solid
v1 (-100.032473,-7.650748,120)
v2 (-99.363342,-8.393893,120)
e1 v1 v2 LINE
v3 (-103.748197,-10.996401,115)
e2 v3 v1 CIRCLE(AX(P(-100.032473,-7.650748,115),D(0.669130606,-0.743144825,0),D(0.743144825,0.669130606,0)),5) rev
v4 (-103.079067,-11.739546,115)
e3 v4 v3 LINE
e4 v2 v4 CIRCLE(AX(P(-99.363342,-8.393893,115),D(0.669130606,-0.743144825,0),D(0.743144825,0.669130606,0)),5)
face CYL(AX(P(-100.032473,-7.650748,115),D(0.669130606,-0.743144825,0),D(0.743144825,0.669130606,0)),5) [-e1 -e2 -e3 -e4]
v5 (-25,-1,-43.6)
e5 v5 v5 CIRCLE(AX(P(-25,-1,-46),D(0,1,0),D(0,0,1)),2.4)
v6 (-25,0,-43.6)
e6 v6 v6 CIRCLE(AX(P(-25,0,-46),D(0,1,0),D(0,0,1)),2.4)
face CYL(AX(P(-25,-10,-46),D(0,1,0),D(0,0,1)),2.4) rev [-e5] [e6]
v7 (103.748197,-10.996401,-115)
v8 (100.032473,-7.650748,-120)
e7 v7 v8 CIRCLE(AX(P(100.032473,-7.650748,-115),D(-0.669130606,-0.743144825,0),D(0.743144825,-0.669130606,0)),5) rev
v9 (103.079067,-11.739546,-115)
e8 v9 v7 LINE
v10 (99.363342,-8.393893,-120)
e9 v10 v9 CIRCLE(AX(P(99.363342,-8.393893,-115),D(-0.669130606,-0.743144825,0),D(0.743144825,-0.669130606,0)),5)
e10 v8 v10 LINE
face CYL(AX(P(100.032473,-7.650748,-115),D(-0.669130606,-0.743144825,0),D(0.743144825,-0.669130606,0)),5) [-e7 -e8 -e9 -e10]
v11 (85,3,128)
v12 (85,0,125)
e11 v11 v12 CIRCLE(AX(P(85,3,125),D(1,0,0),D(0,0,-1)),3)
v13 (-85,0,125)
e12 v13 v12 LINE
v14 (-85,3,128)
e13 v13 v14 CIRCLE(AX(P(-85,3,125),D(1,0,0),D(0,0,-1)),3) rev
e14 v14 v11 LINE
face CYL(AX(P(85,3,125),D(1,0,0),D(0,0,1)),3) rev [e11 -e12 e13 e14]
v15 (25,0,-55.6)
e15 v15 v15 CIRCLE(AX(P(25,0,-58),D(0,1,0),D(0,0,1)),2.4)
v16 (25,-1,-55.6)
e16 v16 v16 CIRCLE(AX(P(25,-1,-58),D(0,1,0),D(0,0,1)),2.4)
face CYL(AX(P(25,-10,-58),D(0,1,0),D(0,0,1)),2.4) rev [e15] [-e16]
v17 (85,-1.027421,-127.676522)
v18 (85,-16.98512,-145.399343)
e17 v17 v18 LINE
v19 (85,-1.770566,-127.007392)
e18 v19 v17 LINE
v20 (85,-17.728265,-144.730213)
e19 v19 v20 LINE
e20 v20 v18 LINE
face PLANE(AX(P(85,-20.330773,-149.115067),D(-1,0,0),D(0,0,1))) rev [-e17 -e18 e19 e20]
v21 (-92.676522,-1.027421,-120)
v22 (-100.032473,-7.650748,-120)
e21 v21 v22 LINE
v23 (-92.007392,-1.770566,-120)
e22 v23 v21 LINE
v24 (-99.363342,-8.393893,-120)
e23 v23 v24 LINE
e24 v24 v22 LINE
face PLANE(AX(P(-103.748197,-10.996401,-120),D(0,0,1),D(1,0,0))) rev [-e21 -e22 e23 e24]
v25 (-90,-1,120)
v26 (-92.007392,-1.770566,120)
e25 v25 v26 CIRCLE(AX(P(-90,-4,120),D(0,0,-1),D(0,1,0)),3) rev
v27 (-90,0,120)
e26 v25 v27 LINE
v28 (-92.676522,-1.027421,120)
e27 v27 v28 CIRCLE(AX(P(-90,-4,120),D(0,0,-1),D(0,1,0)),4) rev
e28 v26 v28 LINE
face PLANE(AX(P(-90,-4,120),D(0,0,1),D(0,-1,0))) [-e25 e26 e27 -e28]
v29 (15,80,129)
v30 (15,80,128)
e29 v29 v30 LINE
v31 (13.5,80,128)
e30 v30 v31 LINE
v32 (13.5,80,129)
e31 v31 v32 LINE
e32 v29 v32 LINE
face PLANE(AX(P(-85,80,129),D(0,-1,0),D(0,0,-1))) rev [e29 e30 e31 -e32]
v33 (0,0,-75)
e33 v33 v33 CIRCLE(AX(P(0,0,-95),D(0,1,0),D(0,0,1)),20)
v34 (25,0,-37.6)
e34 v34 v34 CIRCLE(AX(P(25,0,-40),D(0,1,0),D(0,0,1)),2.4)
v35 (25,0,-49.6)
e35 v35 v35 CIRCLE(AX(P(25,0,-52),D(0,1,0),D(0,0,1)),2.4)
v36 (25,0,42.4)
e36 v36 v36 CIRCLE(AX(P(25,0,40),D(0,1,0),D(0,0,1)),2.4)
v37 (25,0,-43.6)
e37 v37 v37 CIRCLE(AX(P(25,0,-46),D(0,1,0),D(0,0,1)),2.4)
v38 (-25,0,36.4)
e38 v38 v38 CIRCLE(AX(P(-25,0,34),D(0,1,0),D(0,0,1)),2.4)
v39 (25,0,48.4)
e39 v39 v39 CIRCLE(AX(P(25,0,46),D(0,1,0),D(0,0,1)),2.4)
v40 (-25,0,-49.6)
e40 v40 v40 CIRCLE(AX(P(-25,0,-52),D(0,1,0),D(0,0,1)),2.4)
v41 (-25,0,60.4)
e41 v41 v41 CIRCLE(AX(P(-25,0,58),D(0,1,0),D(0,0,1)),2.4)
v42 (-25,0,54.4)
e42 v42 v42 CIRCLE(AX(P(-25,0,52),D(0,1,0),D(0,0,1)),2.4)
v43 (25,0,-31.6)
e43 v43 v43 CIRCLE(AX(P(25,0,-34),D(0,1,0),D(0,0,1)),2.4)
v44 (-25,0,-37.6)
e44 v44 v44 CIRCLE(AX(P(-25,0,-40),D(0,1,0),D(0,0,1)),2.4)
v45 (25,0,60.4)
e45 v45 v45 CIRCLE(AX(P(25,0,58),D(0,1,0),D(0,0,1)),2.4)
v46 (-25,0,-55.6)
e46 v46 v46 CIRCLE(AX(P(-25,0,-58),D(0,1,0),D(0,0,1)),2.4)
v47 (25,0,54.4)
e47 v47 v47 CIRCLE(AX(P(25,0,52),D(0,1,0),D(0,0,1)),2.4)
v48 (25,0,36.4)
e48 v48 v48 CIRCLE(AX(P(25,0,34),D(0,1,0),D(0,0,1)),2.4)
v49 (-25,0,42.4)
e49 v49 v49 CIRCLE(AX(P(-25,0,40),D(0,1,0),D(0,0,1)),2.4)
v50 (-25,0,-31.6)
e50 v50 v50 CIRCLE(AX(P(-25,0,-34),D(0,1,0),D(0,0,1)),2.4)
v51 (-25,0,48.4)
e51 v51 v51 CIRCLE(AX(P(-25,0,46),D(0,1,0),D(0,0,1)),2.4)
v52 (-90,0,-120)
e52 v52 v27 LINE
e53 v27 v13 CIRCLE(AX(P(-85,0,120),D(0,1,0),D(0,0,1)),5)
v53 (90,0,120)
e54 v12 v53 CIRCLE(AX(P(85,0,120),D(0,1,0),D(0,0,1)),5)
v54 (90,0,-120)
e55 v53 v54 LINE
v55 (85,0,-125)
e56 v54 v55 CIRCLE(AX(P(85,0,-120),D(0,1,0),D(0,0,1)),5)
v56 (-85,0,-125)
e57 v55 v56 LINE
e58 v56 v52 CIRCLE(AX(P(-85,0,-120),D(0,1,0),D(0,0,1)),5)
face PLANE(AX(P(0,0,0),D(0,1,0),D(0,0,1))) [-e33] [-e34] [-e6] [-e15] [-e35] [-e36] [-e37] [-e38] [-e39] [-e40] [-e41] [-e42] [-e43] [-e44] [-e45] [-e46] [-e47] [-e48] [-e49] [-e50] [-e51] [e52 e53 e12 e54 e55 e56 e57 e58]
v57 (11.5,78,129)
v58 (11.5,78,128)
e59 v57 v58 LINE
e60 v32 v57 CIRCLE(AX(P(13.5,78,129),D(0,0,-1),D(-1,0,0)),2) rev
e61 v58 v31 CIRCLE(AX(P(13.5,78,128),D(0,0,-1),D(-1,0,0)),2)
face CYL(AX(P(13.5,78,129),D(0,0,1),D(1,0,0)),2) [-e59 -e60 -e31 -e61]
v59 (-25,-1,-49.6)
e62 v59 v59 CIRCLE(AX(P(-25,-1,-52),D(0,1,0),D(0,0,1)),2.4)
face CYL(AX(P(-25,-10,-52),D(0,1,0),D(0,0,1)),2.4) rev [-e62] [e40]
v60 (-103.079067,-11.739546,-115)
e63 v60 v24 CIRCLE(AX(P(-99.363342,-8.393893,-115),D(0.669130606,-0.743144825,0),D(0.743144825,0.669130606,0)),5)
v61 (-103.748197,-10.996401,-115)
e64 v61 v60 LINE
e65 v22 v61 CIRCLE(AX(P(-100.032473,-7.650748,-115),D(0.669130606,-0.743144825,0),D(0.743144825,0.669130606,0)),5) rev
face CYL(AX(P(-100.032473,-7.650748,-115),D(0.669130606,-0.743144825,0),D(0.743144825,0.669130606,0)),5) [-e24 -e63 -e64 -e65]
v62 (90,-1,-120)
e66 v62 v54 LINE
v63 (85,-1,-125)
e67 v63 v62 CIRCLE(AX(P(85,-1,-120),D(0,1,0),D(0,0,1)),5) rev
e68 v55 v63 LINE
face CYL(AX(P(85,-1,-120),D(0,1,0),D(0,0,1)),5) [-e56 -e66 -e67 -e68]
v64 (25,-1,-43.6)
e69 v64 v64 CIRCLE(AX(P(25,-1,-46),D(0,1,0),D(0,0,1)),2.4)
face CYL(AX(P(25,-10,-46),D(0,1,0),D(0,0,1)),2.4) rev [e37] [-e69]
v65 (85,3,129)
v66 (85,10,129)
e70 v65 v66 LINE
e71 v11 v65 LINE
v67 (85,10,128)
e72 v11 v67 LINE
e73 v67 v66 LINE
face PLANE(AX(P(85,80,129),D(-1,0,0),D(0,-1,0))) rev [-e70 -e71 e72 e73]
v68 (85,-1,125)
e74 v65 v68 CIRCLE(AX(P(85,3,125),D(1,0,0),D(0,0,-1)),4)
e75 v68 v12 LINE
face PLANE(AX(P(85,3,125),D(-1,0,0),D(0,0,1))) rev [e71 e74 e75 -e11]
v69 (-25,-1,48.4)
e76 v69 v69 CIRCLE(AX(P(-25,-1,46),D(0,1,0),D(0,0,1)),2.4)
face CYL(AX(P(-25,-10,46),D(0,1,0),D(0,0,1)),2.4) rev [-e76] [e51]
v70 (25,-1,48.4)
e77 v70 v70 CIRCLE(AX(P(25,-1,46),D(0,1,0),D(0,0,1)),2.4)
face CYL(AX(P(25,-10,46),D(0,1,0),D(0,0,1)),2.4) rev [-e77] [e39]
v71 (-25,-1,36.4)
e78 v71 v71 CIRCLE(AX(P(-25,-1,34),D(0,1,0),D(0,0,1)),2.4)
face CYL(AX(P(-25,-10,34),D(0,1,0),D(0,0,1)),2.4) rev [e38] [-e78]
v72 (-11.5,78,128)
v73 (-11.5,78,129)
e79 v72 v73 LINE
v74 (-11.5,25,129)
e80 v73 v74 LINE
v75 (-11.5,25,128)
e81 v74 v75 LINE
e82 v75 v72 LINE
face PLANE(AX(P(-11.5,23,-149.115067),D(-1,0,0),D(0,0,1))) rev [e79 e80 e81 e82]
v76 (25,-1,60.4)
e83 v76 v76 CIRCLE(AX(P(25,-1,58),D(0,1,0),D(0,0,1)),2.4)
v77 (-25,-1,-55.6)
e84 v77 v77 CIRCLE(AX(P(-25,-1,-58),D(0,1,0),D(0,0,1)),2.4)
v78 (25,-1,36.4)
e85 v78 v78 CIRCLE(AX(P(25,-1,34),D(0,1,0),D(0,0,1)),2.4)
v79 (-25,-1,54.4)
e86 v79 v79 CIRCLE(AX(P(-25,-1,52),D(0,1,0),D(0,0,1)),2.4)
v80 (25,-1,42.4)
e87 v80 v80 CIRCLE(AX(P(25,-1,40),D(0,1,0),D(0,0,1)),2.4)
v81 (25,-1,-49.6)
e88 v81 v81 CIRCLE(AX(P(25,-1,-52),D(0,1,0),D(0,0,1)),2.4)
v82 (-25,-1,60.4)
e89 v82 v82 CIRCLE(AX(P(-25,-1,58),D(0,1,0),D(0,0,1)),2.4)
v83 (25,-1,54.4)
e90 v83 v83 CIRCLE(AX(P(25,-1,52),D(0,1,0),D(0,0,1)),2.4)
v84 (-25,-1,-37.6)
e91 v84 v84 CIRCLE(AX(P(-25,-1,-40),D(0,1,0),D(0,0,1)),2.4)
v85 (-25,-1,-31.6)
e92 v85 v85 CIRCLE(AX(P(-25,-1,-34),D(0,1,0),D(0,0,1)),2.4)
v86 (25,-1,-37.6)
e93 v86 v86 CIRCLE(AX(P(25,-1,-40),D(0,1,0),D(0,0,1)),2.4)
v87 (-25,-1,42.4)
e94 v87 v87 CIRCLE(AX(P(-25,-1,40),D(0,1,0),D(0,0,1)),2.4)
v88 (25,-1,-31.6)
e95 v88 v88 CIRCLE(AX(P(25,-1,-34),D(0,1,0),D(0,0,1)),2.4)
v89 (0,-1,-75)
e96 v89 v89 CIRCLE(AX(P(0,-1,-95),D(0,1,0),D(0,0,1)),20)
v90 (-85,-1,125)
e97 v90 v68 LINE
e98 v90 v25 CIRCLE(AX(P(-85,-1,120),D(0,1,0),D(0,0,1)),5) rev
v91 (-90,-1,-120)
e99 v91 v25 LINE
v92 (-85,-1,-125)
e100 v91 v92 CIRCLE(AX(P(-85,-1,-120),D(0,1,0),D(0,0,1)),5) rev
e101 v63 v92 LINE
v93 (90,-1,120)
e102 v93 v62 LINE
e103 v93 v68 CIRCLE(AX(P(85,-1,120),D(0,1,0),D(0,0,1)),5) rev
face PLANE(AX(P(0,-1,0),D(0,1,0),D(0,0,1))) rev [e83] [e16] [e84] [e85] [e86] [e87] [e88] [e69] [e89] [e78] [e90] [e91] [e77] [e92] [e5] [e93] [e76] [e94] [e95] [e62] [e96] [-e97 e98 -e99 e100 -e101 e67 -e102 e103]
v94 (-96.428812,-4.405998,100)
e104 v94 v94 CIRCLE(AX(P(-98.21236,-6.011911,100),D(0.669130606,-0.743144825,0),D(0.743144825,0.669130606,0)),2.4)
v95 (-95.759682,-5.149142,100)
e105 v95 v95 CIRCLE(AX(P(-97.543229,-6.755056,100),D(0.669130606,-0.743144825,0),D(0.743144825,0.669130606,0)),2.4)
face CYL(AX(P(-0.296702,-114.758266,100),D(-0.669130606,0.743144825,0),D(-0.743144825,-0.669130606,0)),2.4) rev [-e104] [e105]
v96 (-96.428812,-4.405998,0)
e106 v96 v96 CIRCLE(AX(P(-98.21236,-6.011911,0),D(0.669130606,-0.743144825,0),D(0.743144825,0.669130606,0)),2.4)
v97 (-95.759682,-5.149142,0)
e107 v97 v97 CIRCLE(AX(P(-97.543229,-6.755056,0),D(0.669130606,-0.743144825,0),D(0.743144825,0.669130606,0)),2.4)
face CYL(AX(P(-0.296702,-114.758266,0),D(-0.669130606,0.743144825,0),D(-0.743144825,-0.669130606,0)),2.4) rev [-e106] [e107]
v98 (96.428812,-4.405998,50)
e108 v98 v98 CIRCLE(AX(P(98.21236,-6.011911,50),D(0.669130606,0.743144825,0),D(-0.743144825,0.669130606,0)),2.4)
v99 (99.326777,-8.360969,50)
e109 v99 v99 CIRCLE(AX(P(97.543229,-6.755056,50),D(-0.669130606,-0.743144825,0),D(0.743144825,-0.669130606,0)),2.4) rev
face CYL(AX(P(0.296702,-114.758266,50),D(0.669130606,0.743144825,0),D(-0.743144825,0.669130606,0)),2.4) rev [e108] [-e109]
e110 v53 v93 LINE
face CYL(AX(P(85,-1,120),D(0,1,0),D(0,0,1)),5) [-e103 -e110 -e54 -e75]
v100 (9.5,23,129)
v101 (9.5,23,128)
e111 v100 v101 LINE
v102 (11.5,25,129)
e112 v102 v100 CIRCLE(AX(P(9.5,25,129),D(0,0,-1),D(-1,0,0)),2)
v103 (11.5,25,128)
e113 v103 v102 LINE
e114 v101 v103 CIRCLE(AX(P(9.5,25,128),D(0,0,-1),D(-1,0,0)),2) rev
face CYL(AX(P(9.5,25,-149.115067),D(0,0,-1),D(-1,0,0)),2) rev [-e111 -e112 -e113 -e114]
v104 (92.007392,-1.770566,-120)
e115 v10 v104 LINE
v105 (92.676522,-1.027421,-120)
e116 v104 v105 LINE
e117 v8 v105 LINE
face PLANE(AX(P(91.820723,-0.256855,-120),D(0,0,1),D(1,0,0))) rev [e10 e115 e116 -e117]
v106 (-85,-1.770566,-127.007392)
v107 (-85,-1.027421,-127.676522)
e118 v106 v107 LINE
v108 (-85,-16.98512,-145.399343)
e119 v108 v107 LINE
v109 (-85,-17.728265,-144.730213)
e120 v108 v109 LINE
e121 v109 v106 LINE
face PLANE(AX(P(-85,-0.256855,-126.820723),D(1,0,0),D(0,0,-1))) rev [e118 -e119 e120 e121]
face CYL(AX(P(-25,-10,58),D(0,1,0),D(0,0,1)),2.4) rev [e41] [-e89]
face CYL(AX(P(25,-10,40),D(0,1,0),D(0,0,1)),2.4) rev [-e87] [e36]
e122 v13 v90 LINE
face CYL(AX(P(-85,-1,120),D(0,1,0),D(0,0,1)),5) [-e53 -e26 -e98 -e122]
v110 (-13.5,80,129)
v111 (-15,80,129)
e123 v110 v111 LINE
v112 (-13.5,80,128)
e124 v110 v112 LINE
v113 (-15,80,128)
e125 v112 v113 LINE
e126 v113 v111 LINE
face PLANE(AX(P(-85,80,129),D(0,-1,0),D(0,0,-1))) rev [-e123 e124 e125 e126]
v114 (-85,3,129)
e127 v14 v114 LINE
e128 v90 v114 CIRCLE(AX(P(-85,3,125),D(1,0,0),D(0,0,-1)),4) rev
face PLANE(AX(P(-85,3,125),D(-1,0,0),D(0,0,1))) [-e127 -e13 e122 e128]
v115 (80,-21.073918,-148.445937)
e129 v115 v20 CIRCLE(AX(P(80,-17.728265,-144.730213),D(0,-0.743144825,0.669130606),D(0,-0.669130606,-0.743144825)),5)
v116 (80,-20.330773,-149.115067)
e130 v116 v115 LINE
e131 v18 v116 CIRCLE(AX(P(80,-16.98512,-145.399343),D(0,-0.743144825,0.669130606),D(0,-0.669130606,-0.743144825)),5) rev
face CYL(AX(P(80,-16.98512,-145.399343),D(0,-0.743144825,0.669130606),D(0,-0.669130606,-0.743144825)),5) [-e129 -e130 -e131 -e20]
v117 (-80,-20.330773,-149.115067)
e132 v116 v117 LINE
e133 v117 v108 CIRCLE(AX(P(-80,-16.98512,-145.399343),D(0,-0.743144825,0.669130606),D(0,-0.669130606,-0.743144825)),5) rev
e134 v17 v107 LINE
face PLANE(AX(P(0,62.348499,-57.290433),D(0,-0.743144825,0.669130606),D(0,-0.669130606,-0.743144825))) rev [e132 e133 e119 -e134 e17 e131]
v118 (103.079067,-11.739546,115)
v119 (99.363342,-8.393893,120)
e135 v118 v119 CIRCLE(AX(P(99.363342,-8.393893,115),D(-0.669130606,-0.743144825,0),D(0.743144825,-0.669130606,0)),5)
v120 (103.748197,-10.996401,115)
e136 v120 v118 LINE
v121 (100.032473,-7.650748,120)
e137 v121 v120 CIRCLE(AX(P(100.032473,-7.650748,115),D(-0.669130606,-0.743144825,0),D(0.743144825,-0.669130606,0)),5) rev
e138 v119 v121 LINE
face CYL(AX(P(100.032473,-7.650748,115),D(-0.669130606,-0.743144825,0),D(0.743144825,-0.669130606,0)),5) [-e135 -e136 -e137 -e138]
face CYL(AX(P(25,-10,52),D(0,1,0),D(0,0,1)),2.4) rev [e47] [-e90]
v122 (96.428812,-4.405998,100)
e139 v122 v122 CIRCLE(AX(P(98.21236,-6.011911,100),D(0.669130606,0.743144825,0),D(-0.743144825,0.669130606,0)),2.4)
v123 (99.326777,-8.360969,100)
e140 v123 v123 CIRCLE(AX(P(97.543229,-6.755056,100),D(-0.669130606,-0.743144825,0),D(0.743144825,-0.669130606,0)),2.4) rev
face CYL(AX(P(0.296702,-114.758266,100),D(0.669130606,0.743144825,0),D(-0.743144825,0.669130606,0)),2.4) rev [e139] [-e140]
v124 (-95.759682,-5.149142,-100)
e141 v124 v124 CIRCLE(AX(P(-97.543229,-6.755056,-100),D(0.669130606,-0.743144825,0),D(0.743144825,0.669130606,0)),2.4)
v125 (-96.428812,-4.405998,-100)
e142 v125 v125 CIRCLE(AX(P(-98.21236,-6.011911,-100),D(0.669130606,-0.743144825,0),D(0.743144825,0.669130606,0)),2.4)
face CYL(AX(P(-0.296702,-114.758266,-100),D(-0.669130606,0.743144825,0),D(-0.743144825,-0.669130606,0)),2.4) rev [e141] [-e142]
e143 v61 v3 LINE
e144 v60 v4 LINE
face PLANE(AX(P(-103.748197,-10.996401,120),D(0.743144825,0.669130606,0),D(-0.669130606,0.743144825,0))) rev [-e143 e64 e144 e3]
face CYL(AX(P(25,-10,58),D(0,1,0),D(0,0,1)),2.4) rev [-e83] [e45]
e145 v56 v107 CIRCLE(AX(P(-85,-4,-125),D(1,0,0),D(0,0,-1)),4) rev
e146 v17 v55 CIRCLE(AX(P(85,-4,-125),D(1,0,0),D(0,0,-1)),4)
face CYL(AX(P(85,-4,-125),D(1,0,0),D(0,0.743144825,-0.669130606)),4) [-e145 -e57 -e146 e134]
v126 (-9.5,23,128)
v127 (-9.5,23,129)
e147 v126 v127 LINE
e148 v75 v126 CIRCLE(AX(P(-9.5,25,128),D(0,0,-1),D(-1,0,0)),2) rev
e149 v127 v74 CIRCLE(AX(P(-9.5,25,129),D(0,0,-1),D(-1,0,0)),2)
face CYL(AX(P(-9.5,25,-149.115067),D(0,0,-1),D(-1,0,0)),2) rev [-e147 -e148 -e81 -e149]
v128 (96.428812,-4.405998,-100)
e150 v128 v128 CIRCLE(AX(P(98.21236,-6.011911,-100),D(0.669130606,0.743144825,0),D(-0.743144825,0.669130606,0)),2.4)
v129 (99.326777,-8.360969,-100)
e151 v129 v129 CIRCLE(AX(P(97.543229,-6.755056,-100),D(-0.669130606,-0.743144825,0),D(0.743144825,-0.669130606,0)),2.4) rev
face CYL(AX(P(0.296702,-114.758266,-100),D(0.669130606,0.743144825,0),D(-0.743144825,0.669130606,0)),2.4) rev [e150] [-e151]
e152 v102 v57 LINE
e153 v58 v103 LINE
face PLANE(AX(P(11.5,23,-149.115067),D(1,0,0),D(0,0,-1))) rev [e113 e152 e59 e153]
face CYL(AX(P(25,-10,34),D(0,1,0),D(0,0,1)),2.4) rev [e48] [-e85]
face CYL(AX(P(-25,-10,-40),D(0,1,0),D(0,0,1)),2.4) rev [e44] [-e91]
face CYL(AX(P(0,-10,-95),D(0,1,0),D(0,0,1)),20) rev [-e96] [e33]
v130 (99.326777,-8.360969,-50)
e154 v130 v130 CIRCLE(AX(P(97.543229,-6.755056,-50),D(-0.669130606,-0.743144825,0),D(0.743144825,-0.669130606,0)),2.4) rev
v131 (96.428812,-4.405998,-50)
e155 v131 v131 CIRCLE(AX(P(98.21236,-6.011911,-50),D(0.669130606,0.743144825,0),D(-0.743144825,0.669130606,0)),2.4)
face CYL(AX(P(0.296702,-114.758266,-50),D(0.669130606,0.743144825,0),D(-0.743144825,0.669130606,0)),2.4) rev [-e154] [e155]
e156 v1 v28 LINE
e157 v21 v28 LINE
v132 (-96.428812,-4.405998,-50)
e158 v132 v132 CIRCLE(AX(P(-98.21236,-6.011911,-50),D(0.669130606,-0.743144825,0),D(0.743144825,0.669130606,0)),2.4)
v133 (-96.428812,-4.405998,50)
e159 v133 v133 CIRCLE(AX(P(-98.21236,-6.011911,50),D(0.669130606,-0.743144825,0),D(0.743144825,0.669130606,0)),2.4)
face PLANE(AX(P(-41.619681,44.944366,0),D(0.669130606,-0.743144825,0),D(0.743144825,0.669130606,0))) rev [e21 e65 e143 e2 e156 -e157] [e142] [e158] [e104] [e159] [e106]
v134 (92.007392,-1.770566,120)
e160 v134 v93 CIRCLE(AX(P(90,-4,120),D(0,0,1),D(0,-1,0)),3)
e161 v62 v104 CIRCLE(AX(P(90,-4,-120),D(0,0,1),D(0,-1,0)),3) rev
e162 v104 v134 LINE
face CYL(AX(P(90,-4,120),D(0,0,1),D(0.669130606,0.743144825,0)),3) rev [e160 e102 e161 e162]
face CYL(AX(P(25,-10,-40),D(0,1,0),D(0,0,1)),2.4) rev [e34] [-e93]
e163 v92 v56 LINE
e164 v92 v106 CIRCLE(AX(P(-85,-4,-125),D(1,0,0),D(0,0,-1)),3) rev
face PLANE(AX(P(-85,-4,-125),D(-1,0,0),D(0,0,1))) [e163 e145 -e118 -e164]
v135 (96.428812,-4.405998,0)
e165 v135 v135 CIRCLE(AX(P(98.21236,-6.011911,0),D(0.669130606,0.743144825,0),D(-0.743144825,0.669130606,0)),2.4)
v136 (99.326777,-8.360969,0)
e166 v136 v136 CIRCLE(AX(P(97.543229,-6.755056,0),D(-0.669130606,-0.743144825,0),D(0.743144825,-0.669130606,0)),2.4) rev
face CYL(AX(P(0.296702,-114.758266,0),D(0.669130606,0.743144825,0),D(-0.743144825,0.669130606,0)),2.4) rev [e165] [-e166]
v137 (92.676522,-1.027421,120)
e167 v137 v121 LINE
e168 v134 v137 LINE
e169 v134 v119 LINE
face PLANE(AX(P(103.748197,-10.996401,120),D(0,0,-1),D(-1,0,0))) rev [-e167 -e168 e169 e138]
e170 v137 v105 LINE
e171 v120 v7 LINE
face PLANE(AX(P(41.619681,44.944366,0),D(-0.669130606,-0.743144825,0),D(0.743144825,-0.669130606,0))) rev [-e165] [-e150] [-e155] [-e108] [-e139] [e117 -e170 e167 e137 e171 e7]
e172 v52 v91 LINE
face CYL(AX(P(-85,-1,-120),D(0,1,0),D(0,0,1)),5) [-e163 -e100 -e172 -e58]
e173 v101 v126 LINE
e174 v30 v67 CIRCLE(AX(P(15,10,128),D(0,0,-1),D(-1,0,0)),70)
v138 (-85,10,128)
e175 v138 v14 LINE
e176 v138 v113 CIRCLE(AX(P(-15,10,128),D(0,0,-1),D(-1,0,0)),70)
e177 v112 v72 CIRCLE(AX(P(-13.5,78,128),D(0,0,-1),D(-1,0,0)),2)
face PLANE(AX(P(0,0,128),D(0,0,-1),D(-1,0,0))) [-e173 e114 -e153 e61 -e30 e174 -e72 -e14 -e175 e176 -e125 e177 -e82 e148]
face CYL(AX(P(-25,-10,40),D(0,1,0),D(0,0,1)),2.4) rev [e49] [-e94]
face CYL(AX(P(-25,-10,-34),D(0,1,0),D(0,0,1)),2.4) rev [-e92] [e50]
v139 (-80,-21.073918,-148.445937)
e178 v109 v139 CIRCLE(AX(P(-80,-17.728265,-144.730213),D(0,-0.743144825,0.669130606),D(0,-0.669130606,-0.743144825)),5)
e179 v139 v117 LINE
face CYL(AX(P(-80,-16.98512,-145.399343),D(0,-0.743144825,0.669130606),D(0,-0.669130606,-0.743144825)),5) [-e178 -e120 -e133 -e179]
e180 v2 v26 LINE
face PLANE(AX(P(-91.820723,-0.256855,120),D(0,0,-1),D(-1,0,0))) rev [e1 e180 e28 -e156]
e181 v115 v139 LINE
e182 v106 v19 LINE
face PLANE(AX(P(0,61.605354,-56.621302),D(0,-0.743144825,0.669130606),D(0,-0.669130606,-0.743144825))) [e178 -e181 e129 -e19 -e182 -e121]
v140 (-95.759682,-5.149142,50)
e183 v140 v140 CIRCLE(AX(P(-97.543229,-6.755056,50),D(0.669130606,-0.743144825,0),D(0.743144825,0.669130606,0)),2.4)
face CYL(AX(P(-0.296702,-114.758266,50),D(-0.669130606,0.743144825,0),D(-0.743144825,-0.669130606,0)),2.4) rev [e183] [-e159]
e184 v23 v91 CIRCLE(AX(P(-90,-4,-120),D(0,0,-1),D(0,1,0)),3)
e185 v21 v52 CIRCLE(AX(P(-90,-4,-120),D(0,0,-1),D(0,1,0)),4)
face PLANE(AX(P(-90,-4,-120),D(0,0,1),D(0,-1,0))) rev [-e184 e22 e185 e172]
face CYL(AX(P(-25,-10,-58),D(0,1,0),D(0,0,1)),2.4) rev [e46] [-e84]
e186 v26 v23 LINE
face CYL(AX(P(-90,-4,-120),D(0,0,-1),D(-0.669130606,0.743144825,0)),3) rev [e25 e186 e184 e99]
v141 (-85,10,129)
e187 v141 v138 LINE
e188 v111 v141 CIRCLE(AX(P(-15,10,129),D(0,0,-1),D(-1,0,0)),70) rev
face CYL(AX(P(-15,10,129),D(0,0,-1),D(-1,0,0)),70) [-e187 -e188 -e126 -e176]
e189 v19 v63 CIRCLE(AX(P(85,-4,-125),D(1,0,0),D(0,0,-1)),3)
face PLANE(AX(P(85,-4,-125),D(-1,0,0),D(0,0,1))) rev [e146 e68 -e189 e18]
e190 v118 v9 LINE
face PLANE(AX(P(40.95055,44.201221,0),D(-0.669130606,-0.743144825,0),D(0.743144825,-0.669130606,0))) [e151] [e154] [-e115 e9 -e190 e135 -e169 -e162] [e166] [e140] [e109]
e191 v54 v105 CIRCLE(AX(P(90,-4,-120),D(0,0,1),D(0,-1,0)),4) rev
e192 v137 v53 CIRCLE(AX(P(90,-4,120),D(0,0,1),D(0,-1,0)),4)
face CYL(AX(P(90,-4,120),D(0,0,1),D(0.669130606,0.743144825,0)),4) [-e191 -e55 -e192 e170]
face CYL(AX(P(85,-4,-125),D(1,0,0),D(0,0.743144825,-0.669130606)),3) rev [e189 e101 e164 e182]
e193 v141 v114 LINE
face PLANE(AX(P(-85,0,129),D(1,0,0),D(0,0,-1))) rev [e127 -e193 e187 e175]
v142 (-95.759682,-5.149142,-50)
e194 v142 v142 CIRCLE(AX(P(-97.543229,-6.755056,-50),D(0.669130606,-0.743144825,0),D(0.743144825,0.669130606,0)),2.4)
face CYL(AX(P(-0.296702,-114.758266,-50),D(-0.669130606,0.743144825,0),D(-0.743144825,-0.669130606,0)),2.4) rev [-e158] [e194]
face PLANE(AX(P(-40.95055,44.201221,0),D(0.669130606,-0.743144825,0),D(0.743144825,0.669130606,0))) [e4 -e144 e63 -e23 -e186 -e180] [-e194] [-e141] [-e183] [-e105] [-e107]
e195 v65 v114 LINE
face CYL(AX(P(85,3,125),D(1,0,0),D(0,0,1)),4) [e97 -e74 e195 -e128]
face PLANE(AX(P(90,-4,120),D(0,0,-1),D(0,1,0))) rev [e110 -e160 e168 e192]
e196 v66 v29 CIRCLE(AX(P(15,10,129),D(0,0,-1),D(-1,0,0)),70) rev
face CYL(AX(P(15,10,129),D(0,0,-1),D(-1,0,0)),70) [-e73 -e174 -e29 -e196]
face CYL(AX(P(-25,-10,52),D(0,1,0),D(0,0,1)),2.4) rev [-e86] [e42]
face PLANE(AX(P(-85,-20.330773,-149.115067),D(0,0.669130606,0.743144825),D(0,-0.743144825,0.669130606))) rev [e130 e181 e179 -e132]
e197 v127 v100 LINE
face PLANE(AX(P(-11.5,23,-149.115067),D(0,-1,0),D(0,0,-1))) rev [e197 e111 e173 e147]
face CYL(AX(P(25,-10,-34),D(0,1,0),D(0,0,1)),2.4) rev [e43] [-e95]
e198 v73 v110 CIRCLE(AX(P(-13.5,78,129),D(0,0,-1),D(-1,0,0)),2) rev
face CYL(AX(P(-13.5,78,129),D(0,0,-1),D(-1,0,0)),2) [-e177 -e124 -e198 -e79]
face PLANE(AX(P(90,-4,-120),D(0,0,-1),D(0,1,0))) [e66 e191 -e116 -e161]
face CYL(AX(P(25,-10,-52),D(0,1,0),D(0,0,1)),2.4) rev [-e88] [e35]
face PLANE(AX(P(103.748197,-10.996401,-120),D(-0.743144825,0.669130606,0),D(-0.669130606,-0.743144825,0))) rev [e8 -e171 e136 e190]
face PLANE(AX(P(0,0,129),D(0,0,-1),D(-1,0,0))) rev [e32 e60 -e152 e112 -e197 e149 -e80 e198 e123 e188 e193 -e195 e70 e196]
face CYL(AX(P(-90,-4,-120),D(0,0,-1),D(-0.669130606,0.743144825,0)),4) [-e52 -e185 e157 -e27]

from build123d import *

# Parameters (mm, degrees)
ESBO_O1_W                 = 180
ESBO_O1_H                 = 250
FLANGE_BASE1_DEPTH        = 1
ESBO_O6_R                 = 2.4
ESBO_O6_R_2               = 20
CORTE_EXTRUS_O1_DEPTH     = 10
FILETE1_R                 = 5
ARESTA_FLANGE1_DEPTH      = 170
ARESTA_FLANGE2_DEPTH      = 240
ARESTA_FLANGE2_BEND_DEPTH = 240
FILETE2_R                 = 5
ARESTA_FLANGE3_DEPTH      = 170
FILETE3_R                 = 70
ESBO_O29_W                = 23
ESBO_O29_H                = 57
CORTE_EXTRUS_O2_DEPTH     = 308.427518565
FILETE4_R                 = 2
CORTE_EXTRUS_O3_REACH     = 220.213
ESBO_O32_R                = 2.4


# Sheet-metal steps are written as plain solids
with BuildPart() as part:
    # Esboço1 → Flange-base1 (new body)
    with BuildSketch(Plane(origin=(0, 0, 0), x_dir=(1, 0, 0), z_dir=(0, 1, 0))):
        Rectangle(ESBO_O1_W, ESBO_O1_H)
    extrude(amount=-FLANGE_BASE1_DEPTH)

    # Esboço6 → Corte-extrusão1 (cut)
    with BuildSketch(Plane(origin=(0, 0, 0), x_dir=(1, 0, 0), z_dir=(0, 1, 0))):
        with Locations(Location((-25, 52, 0), (0, 0, 270))):
            Circle(ESBO_O6_R)
        with Locations(Location((25, 52, 0), (0, 0, 270))):
            Circle(ESBO_O6_R)
        with Locations(Location((-25, -40, 0), (0, 0, 270))):
            Circle(ESBO_O6_R)
        with Locations(Location((25, -40, 0), (0, 0, 270))):
            Circle(ESBO_O6_R)
        with Locations(Location((-25, -46, 0), (0, 0, 270))):
            Circle(ESBO_O6_R)
        with Locations(Location((25, -46, 0), (0, 0, 270))):
            Circle(ESBO_O6_R)
        with Locations(Location((-25, 46, 0), (0, 0, 270))):
            Circle(ESBO_O6_R)
        with Locations(Location((25, 46, 0), (0, 0, 270))):
            Circle(ESBO_O6_R)
        with Locations(Location((-25, 58, 0), (0, 0, 270))):
            Circle(ESBO_O6_R)
        with Locations(Location((25, 58, 0), (0, 0, 270))):
            Circle(ESBO_O6_R)
        with Locations(Location((-25, -34, 0), (0, 0, 270))):
            Circle(ESBO_O6_R)
        with Locations(Location((25, -34, 0), (0, 0, 270))):
            Circle(ESBO_O6_R)
        with Locations(Location((-25, 40, 0), (0, 0, 270))):
            Circle(ESBO_O6_R)
        with Locations(Location((25, 40, 0), (0, 0, 270))):
            Circle(ESBO_O6_R)
        with Locations(Location((-25, -52, 0), (0, 0, 270))):
            Circle(ESBO_O6_R)
        with Locations(Location((25, -52, 0), (0, 0, 270))):
            Circle(ESBO_O6_R)
        with Locations(Location((-25, 34, 0), (0, 0, 270))):
            Circle(ESBO_O6_R)
        with Locations(Location((25, 34, 0), (0, 0, 270))):
            Circle(ESBO_O6_R)
        with Locations(Location((-25, -58, 0), (0, 0, 270))):
            Circle(ESBO_O6_R)
        with Locations(Location((25, -58, 0), (0, 0, 270))):
            Circle(ESBO_O6_R)
        with Locations(Location((0, 95, 0), (0, 0, 270))):
            Circle(ESBO_O6_R_2)
    extrude(amount=-CORTE_EXTRUS_O1_DEPTH, mode=Mode.SUBTRACT)

    # Filete1
    filete1_edges = [part.edges().sort_by_distance(p)[0] for p in [
        (90, -0.5, 125),
        (-90, -0.5, 125),
        (-90, -0.5, -125),
        (90, -0.5, -125),
    ]]
    fillet(filete1_edges, radius=FILETE1_R)

    # Aresta-Flange1 section (across the edge) → Aresta-Flange1 (add)
    with BuildSketch(Plane(origin=(-85, -1, -126.151592105), x_dir=(0, -0.7431448254773979, 0.6691306063588541), z_dir=(1, 0, 0))):
        with BuildLine():
            Line((-1, 1.151592105), (-1, 30))
            Line((-1, 30), (0, 30))
            Line((0, 30), (0, 1.151592105))
            ThreePointArc((0, 1.151592105), (0.199258721, 0.076488256), (0.770565524, -0.855799714))
            Line((0.770565524, -0.855799714), (0.027420698, -1.52493032))
            ThreePointArc((0.027420698, -1.52493032), (-0.734321706, -0.281879693), (-1, 1.151592105))
        make_face()
    extrude(amount=ARESTA_FLANGE1_DEPTH)

    # Aresta-Flange2 section (across the edge) → Aresta-Flange2 (add)
    with BuildSketch(Plane(origin=(91.151592105, -1, -120), x_dir=(-0.6691306063588541, -0.7431448254773979, 0), z_dir=(0, 0, 1))):
        with BuildLine():
            Line((-1, 1.151592105), (-1, 16.05))
            Line((-1, 16.05), (0, 16.05))
            Line((0, 16.05), (0, 1.151592105))
            ThreePointArc((0, 1.151592105), (0.199258721, 0.076488256), (0.770565524, -0.855799714))
            Line((0.770565524, -0.855799714), (0.027420698, -1.52493032))
            ThreePointArc((0.027420698, -1.52493032), (-0.734321706, -0.281879693), (-1, 1.151592105))
        make_face()
    extrude(amount=ARESTA_FLANGE2_DEPTH)

    # Aresta-Flange2 section 2 (across the edge) → Aresta-Flange2 bend (add)
    with BuildSketch(Plane(origin=(-91.151592105, -1, 120), x_dir=(0.6691306063588541, -0.7431448254773979, 0), z_dir=(0, 0, -1))):
        with BuildLine():
            Line((-1, 1.151592105), (-1, 16.05))
            Line((-1, 16.05), (0, 16.05))
            Line((0, 16.05), (0, 1.151592105))
            ThreePointArc((0, 1.151592105), (0.199258721, 0.076488256), (0.770565524, -0.855799714))
            Line((0.770565524, -0.855799714), (0.027420698, -1.52493032))
            ThreePointArc((0.027420698, -1.52493032), (-0.734321706, -0.281879693), (-1, 1.151592105))
        make_face()
    extrude(amount=ARESTA_FLANGE2_BEND_DEPTH)

    # Filete2
    filete2_edges = [part.edges().sort_by_distance(p)[0] for p in [
        (-85, -20.702345778, -148.780502173),
        (85, -20.702345778, -148.780502173),
        (103.413631857, -11.367973819, -120),
        (103.413631857, -11.367973819, 120),
        (-103.413631857, -11.367973819, 120),
        (-103.413631857, -11.367973819, -120),
    ]]
    fillet(filete2_edges, radius=FILETE2_R)

    # Aresta-Flange3 section (across the edge) → Aresta-Flange3 (add)
    with BuildSketch(Plane(origin=(-85, 0, 128), x_dir=(0, 0, -1), z_dir=(1, 0, 0))):
        with BuildLine():
            Line((-1, 3), (-1, 80))
            Line((-1, 80), (0, 80))
            Line((0, 80), (0, 3))
            ThreePointArc((0, 3), (0.878679656, 0.878679656), (3, 0))
            Line((3, 0), (3, -1))
            ThreePointArc((3, -1), (0.171572875, 0.171572875), (-1, 3))
        make_face()
    extrude(amount=ARESTA_FLANGE3_DEPTH)

    # Filete3
    filete3_edges = [part.edges().sort_by_distance(p)[0] for p in [
        (-85, 80, 128.5),
        (85, 80, 128.5),
    ]]
    fillet(filete3_edges, radius=FILETE3_R)

    # Esboço29 → Corte-extrusão2 (cut, through all)
    with BuildSketch(Plane.XY.offset(129)):
        with Locations((0, 51.5)):
            Rectangle(ESBO_O29_W, ESBO_O29_H)
    extrude(amount=-CORTE_EXTRUS_O2_DEPTH, mode=Mode.SUBTRACT)

    # Filete4
    filete4_edges = [part.edges().sort_by_distance(p)[0] for p in [
        (-11.5, 80, 128.5),
        (11.5, 80, 128.5),
        (11.5, 23, 128.5),
        (-11.5, 23, 128.5),
    ]]
    fillet(filete4_edges, radius=FILETE4_R)

    # Esboço32 → Corte-extrusão3 (cut, up to next)
    with BuildSketch(Plane(origin=(40.983697788, 45.517007667, 0), x_dir=(0.7431448254773984, -0.6691306063588536, 0), z_dir=(0.6691306063588536, 0.7431448254773984, 0)), mode=Mode.PRIVATE) as corte_extrus_o3_sk1:
        with Locations(Location((77.008760666, 0, 0), (0, 0, 180))):
            Circle(ESBO_O32_R)
    corte_extrus_o3_tool1 = extrude(corte_extrus_o3_sk1.sketch, amount=-CORTE_EXTRUS_O3_REACH, mode=Mode.PRIVATE) & part.part
    # Esboço32 → Corte-extrusão3 (cut, up to next)
    with BuildSketch(Plane(origin=(40.983697788, 45.517007667, 0), x_dir=(0.7431448254773984, -0.6691306063588536, 0), z_dir=(0.6691306063588536, 0.7431448254773984, 0)), mode=Mode.PRIVATE) as corte_extrus_o3_sk2:
        with Locations(Location((77.008760666, -100, 0), (0, 0, 180))):
            Circle(ESBO_O32_R)
    corte_extrus_o3_tool2 = extrude(corte_extrus_o3_sk2.sketch, amount=-CORTE_EXTRUS_O3_REACH, mode=Mode.PRIVATE) & part.part
    # Esboço32 → Corte-extrusão3 (cut, up to next)
    with BuildSketch(Plane(origin=(40.983697788, 45.517007667, 0), x_dir=(0.7431448254773984, -0.6691306063588536, 0), z_dir=(0.6691306063588536, 0.7431448254773984, 0)), mode=Mode.PRIVATE) as corte_extrus_o3_sk3:
        with Locations(Location((77.008760666, -50, 0), (0, 0, 180))):
            Circle(ESBO_O32_R)
    corte_extrus_o3_tool3 = extrude(corte_extrus_o3_sk3.sketch, amount=-CORTE_EXTRUS_O3_REACH, mode=Mode.PRIVATE) & part.part
    # Esboço32 → Corte-extrusão3 (cut, up to next)
    with BuildSketch(Plane(origin=(40.983697788, 45.517007667, 0), x_dir=(0.7431448254773984, -0.6691306063588536, 0), z_dir=(0.6691306063588536, 0.7431448254773984, 0)), mode=Mode.PRIVATE) as corte_extrus_o3_sk4:
        with Locations(Location((77.008760666, 50, 0), (0, 0, 180))):
            Circle(ESBO_O32_R)
    corte_extrus_o3_tool4 = extrude(corte_extrus_o3_sk4.sketch, amount=-CORTE_EXTRUS_O3_REACH, mode=Mode.PRIVATE) & part.part
    # Esboço32 → Corte-extrusão3 (cut, up to next)
    with BuildSketch(Plane(origin=(40.983697788, 45.517007667, 0), x_dir=(0.7431448254773984, -0.6691306063588536, 0), z_dir=(0.6691306063588536, 0.7431448254773984, 0)), mode=Mode.PRIVATE) as corte_extrus_o3_sk5:
        with Locations(Location((77.008760666, 100, 0), (0, 0, 180))):
            Circle(ESBO_O32_R)
    corte_extrus_o3_tool5 = extrude(corte_extrus_o3_sk5.sketch, amount=-CORTE_EXTRUS_O3_REACH, mode=Mode.PRIVATE) & part.part
    corte_extrus_o3_1 = corte_extrus_o3_tool1.solids().sort_by_distance((98.21236, -6.011911, 0))[0]
    add(corte_extrus_o3_1, mode=Mode.SUBTRACT)
    corte_extrus_o3_2 = corte_extrus_o3_tool2.solids().sort_by_distance((98.21236, -6.011911, 100))[0]
    add(corte_extrus_o3_2, mode=Mode.SUBTRACT)
    corte_extrus_o3_3 = corte_extrus_o3_tool3.solids().sort_by_distance((98.21236, -6.011911, 50))[0]
    add(corte_extrus_o3_3, mode=Mode.SUBTRACT)
    corte_extrus_o3_4 = corte_extrus_o3_tool4.solids().sort_by_distance((98.21236, -6.011911, -50))[0]
    add(corte_extrus_o3_4, mode=Mode.SUBTRACT)
    corte_extrus_o3_5 = corte_extrus_o3_tool5.solids().sort_by_distance((98.21236, -6.011911, -100))[0]
    add(corte_extrus_o3_5, mode=Mode.SUBTRACT)
    corte_extrus_o3 = corte_extrus_o3_1 + corte_extrus_o3_2 + corte_extrus_o3_3 + corte_extrus_o3_4 + corte_extrus_o3_5  # Corte-extrusão3 as one shape, for the pattern or mirror that repeats it

    # Espelhar1: Corte-extrusão3 across plane
    add(corte_extrus_o3.mirror(Plane(origin=(0, 0, 0), x_dir=(0, 0, 1), z_dir=(1, 0, 0))), mode=Mode.SUBTRACT)


solid = part.part
